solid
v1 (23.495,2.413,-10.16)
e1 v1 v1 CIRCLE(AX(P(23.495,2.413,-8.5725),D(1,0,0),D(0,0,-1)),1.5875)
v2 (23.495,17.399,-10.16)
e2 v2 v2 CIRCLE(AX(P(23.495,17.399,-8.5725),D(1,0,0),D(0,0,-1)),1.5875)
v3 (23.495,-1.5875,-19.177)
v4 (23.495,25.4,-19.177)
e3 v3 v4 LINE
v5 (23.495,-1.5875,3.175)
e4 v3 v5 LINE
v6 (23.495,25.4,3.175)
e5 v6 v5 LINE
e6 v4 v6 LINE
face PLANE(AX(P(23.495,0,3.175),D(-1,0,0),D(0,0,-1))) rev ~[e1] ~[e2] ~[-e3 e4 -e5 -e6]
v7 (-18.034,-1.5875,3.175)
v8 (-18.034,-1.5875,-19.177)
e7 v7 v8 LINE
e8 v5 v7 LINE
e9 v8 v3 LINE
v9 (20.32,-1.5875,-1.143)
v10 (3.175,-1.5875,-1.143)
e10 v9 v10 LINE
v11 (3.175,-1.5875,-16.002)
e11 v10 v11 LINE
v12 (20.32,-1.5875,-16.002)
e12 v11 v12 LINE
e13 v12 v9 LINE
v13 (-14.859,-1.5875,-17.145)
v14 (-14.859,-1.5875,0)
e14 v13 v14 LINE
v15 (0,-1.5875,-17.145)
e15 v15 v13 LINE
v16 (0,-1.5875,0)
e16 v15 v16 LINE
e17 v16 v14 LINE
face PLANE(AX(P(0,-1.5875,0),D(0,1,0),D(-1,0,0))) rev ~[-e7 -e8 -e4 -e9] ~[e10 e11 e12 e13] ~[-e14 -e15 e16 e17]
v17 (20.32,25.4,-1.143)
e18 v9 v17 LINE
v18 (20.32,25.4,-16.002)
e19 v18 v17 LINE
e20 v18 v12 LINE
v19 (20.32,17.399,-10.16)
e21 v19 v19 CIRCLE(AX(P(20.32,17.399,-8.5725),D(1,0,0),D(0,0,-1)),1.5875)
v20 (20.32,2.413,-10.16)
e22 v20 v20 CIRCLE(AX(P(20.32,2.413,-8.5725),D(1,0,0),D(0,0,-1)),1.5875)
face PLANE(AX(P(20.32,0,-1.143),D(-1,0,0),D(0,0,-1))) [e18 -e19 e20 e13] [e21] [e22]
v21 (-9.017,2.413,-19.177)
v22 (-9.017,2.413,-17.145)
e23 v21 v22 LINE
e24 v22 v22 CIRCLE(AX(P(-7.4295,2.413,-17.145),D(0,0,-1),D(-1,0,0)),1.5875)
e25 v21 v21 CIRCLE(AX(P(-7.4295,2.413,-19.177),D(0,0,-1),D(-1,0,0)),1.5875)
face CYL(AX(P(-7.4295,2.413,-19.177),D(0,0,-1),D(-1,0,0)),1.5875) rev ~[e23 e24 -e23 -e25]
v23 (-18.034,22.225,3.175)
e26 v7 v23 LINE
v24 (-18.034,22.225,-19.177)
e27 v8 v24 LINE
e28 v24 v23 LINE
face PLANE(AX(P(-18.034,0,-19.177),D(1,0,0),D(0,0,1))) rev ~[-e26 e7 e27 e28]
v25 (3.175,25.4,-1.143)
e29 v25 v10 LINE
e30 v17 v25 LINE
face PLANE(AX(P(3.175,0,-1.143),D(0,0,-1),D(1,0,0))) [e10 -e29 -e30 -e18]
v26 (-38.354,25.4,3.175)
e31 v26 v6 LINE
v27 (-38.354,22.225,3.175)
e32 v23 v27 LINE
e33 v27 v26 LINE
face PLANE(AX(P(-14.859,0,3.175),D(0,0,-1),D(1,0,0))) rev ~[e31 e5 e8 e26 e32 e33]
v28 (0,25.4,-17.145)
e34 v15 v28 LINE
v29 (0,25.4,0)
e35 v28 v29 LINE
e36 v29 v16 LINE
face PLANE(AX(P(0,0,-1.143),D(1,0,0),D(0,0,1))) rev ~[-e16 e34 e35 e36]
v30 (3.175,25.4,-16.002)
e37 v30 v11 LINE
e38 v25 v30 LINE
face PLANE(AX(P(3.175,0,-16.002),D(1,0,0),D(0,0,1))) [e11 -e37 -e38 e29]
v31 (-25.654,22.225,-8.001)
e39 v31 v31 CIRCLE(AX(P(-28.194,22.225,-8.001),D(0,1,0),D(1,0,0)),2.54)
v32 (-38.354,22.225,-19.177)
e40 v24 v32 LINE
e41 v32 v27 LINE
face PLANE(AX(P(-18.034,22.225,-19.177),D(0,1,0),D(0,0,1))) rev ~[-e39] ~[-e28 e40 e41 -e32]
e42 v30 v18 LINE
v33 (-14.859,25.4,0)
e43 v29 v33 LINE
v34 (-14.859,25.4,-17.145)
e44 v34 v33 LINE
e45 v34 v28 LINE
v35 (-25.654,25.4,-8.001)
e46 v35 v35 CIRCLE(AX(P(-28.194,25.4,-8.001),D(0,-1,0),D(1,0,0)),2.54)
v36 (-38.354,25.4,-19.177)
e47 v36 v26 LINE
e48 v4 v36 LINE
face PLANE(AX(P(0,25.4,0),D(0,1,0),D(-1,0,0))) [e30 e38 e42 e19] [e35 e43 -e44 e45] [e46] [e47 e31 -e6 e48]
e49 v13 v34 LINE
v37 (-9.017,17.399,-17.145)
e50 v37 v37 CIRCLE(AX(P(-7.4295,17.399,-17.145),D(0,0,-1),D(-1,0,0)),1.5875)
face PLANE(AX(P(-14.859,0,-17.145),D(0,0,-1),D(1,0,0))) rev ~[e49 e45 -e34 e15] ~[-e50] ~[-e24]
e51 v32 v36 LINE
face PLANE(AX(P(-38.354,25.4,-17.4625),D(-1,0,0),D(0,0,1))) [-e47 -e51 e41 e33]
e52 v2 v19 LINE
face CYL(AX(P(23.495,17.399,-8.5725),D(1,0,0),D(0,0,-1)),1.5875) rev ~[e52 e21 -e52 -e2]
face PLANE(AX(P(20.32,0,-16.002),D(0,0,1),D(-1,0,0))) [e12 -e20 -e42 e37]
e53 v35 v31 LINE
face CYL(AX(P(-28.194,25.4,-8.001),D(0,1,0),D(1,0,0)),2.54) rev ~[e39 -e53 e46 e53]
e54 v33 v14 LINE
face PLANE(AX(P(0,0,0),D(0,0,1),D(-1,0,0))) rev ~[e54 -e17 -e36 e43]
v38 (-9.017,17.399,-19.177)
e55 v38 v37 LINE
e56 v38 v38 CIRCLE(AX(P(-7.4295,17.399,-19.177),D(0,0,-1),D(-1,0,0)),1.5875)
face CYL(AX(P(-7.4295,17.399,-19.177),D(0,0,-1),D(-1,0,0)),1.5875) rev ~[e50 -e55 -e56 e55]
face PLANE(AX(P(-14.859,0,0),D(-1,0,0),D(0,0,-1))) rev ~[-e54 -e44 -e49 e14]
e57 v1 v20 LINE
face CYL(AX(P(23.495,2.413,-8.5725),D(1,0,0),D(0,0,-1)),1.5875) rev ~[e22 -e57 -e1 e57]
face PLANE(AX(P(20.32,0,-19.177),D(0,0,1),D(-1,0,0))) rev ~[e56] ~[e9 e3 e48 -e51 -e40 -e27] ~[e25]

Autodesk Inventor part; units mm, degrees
ref_plane "YZ Plane" through (0, 0, 0) normal (1, 0, 0) x (0, 1, 0)
ref_plane "XZ Plane" through (0, 0, 0) normal (0, 1, 0) x (-1, 0, 0)
ref_plane "XY Plane" through (0, 0, 0) normal (0, 0, 1) x (1, 0, 0)
sketch "Sketch1" plane through (0, 0, 0) normal (0, 1, 0) x (-1, 0, 0)
  line L0 (0, 0) -> (14.859, 0)
  line L1 (14.859, 0) -> (14.859, -17.145)
  line L2 (14.859, -17.145) -> (0, -17.145)
  line L3 (0, -17.145) -> (0, 0)
  line L4 (0, 0) -> (0, -1.143)
  line L5 (0, -1.143) -> (-3.175, -1.143)
  line L6 (-3.175, -1.143) -> (-20.32, -1.143)
  line L7 (-20.32, -1.143) -> (-20.32, -16.002)
  line L8 (-20.32, -16.002) -> (-3.175, -16.002)
  line L9 (-3.175, -16.002) -> (-3.175, -1.143)
  line L10 (14.859, 0) -> (14.859, 3.175)
  line L11 (14.859, 3.175) -> (18.034, 3.175)
  line L12 (-20.32, -1.143) -> (-23.495, -1.143)
  line L13 (-20.32, -16.002) -> (-20.32, -19.177)
  line L14 (-20.32, -19.177) -> (-23.495, -19.177)
  line L15 (18.034, 3.175) -> (-23.495, 3.175)
  line L16 (-23.495, 3.175) -> (-23.495, -19.177)
  line L17 (-23.495, -19.177) -> (18.034, -19.177)
  line L18 (18.034, -19.177) -> (18.034, 3.175)
  dimension "d0" = 14.859
  dimension "d1" = 17.145
  dimension "d2" = 1.143
  dimension "d3" = 3.175
  dimension "d4" = 17.145
  dimension "d5" = 14.859
  dimension "d6" = 3.175
  dimension "d7" = 3.175
  dimension "d8" = 3.175
  dimension "d34" = 3.175
  dimension "d35" = 3.175
extrude "Extrusion1" add sketch "Sketch1" along normal blind 25.4 contours L3 L5 L6 L12 L16 L15 L10 L0 | L10 L11 L18 L17 L13 L8 L9 L5 L3 L2 L1 | L7 L13 L14 L16 L12
sketch "Sketch2" plane through (23.495, 0, 1.5875) normal (1, 0, 0) x (0, 0, -1)
  line L0 (17.5895, 25.4) -> (2.7305, 25.4) projected
  line L1 (10.16, 25.4) -> (10.16, 17.399)
  circle A0 centre (10.16, 17.399) radius 1.5875
  line L2 (10.16, 17.399) -> (10.16, 2.413)
  circle A1 centre (10.16, 2.413) radius 1.5875
  point P0 (1.5875, 0)
  dimension "d13" = 8.001
  dimension "d14" = 3.175
  dimension "d15" = 14.986
  dimension "d16" = 3.175
extrude "Extrusion2" cut sketch "Sketch2" against normal blind 9.525
sketch "Sketch3" plane through (19.05, 0, -19.177) normal (0, 0, -1) x (-1, 0, 0)
  line L0 (33.909, 0) -> (33.909, 25.4) projected
  line L1 (19.05, 0) -> (19.05, 25.4) projected
  line L2 (33.909, 25.4) -> (19.05, 25.4)
  line L3 (26.4795, 25.4) -> (26.4795, 17.399)
  circle A0 centre (26.4795, 17.399) radius 1.5875
  line L4 (26.4795, 17.399) -> (26.4795, 2.413)
  circle A1 centre (26.4795, 2.413) radius 1.5875
  dimension "d19" = 8.001
  dimension "d20" = 3.175
  dimension "d21" = 14.986
  dimension "d22" = 3.175
extrude "Extrusion3" cut sketch "Sketch3" against normal blind 9.525
move faces "Move1" translate (0, -1.5875, 0) faces at (1.8203, 0, 2.1167)
sketch "Sketch4" plane through (-18.034, 25.4, -17.4625) normal (-1, 0, 0) x (0, 0, 1)
  line L0 (19.05, 0) -> (0, 0)
  line L1 (20.6375, -26.9875) -> (20.6375, 0) projected
  line L2 (-1.7145, -26.9875) -> (-1.7145, 0) projected
  line L3 (20.6375, 0) -> (-1.7145, 0)
  line L4 (-1.7145, 0) -> (-1.7145, -3.175)
  line L5 (-1.7145, -3.175) -> (20.6375, -3.175)
  line L6 (20.6375, -3.175) -> (20.6375, 0)
  point P0 (17.4625, -25.4)
  point P1 (20.6375, -3.175)
  dimension "d36" = 3.175
extrude "Extrusion4" add sketch "Sketch4" along normal blind 20.32
sketch "Sketch5" plane through (-15.1765, 25.4, -17.4625) normal (0, -1, 0) x (1, 0, 0)
  line L0 (-23.1775, 20.6375) -> (-23.1775, -1.7145) projected
  line L1 (0.3175, 17.4625) -> (0.3175, 0.3175) projected
  line L2 (-23.1775, 9.4615) -> (0.3175, 9.4615) construction
  line L3 (-23.1775, 9.4615) -> (-2.8575, 9.4615)
  line L4 (-2.8575, -1.7145) -> (-2.8575, 20.6375) projected
  circle A0 centre (-13.0175, 9.4615) radius 2.54
  point P0 (15.1765, 17.4625)
  dimension "d39" = 5.08
extrude "Extrusion5" cut sketch "Sketch5" along normal blind 14.605
properties part number "PluckMount"
